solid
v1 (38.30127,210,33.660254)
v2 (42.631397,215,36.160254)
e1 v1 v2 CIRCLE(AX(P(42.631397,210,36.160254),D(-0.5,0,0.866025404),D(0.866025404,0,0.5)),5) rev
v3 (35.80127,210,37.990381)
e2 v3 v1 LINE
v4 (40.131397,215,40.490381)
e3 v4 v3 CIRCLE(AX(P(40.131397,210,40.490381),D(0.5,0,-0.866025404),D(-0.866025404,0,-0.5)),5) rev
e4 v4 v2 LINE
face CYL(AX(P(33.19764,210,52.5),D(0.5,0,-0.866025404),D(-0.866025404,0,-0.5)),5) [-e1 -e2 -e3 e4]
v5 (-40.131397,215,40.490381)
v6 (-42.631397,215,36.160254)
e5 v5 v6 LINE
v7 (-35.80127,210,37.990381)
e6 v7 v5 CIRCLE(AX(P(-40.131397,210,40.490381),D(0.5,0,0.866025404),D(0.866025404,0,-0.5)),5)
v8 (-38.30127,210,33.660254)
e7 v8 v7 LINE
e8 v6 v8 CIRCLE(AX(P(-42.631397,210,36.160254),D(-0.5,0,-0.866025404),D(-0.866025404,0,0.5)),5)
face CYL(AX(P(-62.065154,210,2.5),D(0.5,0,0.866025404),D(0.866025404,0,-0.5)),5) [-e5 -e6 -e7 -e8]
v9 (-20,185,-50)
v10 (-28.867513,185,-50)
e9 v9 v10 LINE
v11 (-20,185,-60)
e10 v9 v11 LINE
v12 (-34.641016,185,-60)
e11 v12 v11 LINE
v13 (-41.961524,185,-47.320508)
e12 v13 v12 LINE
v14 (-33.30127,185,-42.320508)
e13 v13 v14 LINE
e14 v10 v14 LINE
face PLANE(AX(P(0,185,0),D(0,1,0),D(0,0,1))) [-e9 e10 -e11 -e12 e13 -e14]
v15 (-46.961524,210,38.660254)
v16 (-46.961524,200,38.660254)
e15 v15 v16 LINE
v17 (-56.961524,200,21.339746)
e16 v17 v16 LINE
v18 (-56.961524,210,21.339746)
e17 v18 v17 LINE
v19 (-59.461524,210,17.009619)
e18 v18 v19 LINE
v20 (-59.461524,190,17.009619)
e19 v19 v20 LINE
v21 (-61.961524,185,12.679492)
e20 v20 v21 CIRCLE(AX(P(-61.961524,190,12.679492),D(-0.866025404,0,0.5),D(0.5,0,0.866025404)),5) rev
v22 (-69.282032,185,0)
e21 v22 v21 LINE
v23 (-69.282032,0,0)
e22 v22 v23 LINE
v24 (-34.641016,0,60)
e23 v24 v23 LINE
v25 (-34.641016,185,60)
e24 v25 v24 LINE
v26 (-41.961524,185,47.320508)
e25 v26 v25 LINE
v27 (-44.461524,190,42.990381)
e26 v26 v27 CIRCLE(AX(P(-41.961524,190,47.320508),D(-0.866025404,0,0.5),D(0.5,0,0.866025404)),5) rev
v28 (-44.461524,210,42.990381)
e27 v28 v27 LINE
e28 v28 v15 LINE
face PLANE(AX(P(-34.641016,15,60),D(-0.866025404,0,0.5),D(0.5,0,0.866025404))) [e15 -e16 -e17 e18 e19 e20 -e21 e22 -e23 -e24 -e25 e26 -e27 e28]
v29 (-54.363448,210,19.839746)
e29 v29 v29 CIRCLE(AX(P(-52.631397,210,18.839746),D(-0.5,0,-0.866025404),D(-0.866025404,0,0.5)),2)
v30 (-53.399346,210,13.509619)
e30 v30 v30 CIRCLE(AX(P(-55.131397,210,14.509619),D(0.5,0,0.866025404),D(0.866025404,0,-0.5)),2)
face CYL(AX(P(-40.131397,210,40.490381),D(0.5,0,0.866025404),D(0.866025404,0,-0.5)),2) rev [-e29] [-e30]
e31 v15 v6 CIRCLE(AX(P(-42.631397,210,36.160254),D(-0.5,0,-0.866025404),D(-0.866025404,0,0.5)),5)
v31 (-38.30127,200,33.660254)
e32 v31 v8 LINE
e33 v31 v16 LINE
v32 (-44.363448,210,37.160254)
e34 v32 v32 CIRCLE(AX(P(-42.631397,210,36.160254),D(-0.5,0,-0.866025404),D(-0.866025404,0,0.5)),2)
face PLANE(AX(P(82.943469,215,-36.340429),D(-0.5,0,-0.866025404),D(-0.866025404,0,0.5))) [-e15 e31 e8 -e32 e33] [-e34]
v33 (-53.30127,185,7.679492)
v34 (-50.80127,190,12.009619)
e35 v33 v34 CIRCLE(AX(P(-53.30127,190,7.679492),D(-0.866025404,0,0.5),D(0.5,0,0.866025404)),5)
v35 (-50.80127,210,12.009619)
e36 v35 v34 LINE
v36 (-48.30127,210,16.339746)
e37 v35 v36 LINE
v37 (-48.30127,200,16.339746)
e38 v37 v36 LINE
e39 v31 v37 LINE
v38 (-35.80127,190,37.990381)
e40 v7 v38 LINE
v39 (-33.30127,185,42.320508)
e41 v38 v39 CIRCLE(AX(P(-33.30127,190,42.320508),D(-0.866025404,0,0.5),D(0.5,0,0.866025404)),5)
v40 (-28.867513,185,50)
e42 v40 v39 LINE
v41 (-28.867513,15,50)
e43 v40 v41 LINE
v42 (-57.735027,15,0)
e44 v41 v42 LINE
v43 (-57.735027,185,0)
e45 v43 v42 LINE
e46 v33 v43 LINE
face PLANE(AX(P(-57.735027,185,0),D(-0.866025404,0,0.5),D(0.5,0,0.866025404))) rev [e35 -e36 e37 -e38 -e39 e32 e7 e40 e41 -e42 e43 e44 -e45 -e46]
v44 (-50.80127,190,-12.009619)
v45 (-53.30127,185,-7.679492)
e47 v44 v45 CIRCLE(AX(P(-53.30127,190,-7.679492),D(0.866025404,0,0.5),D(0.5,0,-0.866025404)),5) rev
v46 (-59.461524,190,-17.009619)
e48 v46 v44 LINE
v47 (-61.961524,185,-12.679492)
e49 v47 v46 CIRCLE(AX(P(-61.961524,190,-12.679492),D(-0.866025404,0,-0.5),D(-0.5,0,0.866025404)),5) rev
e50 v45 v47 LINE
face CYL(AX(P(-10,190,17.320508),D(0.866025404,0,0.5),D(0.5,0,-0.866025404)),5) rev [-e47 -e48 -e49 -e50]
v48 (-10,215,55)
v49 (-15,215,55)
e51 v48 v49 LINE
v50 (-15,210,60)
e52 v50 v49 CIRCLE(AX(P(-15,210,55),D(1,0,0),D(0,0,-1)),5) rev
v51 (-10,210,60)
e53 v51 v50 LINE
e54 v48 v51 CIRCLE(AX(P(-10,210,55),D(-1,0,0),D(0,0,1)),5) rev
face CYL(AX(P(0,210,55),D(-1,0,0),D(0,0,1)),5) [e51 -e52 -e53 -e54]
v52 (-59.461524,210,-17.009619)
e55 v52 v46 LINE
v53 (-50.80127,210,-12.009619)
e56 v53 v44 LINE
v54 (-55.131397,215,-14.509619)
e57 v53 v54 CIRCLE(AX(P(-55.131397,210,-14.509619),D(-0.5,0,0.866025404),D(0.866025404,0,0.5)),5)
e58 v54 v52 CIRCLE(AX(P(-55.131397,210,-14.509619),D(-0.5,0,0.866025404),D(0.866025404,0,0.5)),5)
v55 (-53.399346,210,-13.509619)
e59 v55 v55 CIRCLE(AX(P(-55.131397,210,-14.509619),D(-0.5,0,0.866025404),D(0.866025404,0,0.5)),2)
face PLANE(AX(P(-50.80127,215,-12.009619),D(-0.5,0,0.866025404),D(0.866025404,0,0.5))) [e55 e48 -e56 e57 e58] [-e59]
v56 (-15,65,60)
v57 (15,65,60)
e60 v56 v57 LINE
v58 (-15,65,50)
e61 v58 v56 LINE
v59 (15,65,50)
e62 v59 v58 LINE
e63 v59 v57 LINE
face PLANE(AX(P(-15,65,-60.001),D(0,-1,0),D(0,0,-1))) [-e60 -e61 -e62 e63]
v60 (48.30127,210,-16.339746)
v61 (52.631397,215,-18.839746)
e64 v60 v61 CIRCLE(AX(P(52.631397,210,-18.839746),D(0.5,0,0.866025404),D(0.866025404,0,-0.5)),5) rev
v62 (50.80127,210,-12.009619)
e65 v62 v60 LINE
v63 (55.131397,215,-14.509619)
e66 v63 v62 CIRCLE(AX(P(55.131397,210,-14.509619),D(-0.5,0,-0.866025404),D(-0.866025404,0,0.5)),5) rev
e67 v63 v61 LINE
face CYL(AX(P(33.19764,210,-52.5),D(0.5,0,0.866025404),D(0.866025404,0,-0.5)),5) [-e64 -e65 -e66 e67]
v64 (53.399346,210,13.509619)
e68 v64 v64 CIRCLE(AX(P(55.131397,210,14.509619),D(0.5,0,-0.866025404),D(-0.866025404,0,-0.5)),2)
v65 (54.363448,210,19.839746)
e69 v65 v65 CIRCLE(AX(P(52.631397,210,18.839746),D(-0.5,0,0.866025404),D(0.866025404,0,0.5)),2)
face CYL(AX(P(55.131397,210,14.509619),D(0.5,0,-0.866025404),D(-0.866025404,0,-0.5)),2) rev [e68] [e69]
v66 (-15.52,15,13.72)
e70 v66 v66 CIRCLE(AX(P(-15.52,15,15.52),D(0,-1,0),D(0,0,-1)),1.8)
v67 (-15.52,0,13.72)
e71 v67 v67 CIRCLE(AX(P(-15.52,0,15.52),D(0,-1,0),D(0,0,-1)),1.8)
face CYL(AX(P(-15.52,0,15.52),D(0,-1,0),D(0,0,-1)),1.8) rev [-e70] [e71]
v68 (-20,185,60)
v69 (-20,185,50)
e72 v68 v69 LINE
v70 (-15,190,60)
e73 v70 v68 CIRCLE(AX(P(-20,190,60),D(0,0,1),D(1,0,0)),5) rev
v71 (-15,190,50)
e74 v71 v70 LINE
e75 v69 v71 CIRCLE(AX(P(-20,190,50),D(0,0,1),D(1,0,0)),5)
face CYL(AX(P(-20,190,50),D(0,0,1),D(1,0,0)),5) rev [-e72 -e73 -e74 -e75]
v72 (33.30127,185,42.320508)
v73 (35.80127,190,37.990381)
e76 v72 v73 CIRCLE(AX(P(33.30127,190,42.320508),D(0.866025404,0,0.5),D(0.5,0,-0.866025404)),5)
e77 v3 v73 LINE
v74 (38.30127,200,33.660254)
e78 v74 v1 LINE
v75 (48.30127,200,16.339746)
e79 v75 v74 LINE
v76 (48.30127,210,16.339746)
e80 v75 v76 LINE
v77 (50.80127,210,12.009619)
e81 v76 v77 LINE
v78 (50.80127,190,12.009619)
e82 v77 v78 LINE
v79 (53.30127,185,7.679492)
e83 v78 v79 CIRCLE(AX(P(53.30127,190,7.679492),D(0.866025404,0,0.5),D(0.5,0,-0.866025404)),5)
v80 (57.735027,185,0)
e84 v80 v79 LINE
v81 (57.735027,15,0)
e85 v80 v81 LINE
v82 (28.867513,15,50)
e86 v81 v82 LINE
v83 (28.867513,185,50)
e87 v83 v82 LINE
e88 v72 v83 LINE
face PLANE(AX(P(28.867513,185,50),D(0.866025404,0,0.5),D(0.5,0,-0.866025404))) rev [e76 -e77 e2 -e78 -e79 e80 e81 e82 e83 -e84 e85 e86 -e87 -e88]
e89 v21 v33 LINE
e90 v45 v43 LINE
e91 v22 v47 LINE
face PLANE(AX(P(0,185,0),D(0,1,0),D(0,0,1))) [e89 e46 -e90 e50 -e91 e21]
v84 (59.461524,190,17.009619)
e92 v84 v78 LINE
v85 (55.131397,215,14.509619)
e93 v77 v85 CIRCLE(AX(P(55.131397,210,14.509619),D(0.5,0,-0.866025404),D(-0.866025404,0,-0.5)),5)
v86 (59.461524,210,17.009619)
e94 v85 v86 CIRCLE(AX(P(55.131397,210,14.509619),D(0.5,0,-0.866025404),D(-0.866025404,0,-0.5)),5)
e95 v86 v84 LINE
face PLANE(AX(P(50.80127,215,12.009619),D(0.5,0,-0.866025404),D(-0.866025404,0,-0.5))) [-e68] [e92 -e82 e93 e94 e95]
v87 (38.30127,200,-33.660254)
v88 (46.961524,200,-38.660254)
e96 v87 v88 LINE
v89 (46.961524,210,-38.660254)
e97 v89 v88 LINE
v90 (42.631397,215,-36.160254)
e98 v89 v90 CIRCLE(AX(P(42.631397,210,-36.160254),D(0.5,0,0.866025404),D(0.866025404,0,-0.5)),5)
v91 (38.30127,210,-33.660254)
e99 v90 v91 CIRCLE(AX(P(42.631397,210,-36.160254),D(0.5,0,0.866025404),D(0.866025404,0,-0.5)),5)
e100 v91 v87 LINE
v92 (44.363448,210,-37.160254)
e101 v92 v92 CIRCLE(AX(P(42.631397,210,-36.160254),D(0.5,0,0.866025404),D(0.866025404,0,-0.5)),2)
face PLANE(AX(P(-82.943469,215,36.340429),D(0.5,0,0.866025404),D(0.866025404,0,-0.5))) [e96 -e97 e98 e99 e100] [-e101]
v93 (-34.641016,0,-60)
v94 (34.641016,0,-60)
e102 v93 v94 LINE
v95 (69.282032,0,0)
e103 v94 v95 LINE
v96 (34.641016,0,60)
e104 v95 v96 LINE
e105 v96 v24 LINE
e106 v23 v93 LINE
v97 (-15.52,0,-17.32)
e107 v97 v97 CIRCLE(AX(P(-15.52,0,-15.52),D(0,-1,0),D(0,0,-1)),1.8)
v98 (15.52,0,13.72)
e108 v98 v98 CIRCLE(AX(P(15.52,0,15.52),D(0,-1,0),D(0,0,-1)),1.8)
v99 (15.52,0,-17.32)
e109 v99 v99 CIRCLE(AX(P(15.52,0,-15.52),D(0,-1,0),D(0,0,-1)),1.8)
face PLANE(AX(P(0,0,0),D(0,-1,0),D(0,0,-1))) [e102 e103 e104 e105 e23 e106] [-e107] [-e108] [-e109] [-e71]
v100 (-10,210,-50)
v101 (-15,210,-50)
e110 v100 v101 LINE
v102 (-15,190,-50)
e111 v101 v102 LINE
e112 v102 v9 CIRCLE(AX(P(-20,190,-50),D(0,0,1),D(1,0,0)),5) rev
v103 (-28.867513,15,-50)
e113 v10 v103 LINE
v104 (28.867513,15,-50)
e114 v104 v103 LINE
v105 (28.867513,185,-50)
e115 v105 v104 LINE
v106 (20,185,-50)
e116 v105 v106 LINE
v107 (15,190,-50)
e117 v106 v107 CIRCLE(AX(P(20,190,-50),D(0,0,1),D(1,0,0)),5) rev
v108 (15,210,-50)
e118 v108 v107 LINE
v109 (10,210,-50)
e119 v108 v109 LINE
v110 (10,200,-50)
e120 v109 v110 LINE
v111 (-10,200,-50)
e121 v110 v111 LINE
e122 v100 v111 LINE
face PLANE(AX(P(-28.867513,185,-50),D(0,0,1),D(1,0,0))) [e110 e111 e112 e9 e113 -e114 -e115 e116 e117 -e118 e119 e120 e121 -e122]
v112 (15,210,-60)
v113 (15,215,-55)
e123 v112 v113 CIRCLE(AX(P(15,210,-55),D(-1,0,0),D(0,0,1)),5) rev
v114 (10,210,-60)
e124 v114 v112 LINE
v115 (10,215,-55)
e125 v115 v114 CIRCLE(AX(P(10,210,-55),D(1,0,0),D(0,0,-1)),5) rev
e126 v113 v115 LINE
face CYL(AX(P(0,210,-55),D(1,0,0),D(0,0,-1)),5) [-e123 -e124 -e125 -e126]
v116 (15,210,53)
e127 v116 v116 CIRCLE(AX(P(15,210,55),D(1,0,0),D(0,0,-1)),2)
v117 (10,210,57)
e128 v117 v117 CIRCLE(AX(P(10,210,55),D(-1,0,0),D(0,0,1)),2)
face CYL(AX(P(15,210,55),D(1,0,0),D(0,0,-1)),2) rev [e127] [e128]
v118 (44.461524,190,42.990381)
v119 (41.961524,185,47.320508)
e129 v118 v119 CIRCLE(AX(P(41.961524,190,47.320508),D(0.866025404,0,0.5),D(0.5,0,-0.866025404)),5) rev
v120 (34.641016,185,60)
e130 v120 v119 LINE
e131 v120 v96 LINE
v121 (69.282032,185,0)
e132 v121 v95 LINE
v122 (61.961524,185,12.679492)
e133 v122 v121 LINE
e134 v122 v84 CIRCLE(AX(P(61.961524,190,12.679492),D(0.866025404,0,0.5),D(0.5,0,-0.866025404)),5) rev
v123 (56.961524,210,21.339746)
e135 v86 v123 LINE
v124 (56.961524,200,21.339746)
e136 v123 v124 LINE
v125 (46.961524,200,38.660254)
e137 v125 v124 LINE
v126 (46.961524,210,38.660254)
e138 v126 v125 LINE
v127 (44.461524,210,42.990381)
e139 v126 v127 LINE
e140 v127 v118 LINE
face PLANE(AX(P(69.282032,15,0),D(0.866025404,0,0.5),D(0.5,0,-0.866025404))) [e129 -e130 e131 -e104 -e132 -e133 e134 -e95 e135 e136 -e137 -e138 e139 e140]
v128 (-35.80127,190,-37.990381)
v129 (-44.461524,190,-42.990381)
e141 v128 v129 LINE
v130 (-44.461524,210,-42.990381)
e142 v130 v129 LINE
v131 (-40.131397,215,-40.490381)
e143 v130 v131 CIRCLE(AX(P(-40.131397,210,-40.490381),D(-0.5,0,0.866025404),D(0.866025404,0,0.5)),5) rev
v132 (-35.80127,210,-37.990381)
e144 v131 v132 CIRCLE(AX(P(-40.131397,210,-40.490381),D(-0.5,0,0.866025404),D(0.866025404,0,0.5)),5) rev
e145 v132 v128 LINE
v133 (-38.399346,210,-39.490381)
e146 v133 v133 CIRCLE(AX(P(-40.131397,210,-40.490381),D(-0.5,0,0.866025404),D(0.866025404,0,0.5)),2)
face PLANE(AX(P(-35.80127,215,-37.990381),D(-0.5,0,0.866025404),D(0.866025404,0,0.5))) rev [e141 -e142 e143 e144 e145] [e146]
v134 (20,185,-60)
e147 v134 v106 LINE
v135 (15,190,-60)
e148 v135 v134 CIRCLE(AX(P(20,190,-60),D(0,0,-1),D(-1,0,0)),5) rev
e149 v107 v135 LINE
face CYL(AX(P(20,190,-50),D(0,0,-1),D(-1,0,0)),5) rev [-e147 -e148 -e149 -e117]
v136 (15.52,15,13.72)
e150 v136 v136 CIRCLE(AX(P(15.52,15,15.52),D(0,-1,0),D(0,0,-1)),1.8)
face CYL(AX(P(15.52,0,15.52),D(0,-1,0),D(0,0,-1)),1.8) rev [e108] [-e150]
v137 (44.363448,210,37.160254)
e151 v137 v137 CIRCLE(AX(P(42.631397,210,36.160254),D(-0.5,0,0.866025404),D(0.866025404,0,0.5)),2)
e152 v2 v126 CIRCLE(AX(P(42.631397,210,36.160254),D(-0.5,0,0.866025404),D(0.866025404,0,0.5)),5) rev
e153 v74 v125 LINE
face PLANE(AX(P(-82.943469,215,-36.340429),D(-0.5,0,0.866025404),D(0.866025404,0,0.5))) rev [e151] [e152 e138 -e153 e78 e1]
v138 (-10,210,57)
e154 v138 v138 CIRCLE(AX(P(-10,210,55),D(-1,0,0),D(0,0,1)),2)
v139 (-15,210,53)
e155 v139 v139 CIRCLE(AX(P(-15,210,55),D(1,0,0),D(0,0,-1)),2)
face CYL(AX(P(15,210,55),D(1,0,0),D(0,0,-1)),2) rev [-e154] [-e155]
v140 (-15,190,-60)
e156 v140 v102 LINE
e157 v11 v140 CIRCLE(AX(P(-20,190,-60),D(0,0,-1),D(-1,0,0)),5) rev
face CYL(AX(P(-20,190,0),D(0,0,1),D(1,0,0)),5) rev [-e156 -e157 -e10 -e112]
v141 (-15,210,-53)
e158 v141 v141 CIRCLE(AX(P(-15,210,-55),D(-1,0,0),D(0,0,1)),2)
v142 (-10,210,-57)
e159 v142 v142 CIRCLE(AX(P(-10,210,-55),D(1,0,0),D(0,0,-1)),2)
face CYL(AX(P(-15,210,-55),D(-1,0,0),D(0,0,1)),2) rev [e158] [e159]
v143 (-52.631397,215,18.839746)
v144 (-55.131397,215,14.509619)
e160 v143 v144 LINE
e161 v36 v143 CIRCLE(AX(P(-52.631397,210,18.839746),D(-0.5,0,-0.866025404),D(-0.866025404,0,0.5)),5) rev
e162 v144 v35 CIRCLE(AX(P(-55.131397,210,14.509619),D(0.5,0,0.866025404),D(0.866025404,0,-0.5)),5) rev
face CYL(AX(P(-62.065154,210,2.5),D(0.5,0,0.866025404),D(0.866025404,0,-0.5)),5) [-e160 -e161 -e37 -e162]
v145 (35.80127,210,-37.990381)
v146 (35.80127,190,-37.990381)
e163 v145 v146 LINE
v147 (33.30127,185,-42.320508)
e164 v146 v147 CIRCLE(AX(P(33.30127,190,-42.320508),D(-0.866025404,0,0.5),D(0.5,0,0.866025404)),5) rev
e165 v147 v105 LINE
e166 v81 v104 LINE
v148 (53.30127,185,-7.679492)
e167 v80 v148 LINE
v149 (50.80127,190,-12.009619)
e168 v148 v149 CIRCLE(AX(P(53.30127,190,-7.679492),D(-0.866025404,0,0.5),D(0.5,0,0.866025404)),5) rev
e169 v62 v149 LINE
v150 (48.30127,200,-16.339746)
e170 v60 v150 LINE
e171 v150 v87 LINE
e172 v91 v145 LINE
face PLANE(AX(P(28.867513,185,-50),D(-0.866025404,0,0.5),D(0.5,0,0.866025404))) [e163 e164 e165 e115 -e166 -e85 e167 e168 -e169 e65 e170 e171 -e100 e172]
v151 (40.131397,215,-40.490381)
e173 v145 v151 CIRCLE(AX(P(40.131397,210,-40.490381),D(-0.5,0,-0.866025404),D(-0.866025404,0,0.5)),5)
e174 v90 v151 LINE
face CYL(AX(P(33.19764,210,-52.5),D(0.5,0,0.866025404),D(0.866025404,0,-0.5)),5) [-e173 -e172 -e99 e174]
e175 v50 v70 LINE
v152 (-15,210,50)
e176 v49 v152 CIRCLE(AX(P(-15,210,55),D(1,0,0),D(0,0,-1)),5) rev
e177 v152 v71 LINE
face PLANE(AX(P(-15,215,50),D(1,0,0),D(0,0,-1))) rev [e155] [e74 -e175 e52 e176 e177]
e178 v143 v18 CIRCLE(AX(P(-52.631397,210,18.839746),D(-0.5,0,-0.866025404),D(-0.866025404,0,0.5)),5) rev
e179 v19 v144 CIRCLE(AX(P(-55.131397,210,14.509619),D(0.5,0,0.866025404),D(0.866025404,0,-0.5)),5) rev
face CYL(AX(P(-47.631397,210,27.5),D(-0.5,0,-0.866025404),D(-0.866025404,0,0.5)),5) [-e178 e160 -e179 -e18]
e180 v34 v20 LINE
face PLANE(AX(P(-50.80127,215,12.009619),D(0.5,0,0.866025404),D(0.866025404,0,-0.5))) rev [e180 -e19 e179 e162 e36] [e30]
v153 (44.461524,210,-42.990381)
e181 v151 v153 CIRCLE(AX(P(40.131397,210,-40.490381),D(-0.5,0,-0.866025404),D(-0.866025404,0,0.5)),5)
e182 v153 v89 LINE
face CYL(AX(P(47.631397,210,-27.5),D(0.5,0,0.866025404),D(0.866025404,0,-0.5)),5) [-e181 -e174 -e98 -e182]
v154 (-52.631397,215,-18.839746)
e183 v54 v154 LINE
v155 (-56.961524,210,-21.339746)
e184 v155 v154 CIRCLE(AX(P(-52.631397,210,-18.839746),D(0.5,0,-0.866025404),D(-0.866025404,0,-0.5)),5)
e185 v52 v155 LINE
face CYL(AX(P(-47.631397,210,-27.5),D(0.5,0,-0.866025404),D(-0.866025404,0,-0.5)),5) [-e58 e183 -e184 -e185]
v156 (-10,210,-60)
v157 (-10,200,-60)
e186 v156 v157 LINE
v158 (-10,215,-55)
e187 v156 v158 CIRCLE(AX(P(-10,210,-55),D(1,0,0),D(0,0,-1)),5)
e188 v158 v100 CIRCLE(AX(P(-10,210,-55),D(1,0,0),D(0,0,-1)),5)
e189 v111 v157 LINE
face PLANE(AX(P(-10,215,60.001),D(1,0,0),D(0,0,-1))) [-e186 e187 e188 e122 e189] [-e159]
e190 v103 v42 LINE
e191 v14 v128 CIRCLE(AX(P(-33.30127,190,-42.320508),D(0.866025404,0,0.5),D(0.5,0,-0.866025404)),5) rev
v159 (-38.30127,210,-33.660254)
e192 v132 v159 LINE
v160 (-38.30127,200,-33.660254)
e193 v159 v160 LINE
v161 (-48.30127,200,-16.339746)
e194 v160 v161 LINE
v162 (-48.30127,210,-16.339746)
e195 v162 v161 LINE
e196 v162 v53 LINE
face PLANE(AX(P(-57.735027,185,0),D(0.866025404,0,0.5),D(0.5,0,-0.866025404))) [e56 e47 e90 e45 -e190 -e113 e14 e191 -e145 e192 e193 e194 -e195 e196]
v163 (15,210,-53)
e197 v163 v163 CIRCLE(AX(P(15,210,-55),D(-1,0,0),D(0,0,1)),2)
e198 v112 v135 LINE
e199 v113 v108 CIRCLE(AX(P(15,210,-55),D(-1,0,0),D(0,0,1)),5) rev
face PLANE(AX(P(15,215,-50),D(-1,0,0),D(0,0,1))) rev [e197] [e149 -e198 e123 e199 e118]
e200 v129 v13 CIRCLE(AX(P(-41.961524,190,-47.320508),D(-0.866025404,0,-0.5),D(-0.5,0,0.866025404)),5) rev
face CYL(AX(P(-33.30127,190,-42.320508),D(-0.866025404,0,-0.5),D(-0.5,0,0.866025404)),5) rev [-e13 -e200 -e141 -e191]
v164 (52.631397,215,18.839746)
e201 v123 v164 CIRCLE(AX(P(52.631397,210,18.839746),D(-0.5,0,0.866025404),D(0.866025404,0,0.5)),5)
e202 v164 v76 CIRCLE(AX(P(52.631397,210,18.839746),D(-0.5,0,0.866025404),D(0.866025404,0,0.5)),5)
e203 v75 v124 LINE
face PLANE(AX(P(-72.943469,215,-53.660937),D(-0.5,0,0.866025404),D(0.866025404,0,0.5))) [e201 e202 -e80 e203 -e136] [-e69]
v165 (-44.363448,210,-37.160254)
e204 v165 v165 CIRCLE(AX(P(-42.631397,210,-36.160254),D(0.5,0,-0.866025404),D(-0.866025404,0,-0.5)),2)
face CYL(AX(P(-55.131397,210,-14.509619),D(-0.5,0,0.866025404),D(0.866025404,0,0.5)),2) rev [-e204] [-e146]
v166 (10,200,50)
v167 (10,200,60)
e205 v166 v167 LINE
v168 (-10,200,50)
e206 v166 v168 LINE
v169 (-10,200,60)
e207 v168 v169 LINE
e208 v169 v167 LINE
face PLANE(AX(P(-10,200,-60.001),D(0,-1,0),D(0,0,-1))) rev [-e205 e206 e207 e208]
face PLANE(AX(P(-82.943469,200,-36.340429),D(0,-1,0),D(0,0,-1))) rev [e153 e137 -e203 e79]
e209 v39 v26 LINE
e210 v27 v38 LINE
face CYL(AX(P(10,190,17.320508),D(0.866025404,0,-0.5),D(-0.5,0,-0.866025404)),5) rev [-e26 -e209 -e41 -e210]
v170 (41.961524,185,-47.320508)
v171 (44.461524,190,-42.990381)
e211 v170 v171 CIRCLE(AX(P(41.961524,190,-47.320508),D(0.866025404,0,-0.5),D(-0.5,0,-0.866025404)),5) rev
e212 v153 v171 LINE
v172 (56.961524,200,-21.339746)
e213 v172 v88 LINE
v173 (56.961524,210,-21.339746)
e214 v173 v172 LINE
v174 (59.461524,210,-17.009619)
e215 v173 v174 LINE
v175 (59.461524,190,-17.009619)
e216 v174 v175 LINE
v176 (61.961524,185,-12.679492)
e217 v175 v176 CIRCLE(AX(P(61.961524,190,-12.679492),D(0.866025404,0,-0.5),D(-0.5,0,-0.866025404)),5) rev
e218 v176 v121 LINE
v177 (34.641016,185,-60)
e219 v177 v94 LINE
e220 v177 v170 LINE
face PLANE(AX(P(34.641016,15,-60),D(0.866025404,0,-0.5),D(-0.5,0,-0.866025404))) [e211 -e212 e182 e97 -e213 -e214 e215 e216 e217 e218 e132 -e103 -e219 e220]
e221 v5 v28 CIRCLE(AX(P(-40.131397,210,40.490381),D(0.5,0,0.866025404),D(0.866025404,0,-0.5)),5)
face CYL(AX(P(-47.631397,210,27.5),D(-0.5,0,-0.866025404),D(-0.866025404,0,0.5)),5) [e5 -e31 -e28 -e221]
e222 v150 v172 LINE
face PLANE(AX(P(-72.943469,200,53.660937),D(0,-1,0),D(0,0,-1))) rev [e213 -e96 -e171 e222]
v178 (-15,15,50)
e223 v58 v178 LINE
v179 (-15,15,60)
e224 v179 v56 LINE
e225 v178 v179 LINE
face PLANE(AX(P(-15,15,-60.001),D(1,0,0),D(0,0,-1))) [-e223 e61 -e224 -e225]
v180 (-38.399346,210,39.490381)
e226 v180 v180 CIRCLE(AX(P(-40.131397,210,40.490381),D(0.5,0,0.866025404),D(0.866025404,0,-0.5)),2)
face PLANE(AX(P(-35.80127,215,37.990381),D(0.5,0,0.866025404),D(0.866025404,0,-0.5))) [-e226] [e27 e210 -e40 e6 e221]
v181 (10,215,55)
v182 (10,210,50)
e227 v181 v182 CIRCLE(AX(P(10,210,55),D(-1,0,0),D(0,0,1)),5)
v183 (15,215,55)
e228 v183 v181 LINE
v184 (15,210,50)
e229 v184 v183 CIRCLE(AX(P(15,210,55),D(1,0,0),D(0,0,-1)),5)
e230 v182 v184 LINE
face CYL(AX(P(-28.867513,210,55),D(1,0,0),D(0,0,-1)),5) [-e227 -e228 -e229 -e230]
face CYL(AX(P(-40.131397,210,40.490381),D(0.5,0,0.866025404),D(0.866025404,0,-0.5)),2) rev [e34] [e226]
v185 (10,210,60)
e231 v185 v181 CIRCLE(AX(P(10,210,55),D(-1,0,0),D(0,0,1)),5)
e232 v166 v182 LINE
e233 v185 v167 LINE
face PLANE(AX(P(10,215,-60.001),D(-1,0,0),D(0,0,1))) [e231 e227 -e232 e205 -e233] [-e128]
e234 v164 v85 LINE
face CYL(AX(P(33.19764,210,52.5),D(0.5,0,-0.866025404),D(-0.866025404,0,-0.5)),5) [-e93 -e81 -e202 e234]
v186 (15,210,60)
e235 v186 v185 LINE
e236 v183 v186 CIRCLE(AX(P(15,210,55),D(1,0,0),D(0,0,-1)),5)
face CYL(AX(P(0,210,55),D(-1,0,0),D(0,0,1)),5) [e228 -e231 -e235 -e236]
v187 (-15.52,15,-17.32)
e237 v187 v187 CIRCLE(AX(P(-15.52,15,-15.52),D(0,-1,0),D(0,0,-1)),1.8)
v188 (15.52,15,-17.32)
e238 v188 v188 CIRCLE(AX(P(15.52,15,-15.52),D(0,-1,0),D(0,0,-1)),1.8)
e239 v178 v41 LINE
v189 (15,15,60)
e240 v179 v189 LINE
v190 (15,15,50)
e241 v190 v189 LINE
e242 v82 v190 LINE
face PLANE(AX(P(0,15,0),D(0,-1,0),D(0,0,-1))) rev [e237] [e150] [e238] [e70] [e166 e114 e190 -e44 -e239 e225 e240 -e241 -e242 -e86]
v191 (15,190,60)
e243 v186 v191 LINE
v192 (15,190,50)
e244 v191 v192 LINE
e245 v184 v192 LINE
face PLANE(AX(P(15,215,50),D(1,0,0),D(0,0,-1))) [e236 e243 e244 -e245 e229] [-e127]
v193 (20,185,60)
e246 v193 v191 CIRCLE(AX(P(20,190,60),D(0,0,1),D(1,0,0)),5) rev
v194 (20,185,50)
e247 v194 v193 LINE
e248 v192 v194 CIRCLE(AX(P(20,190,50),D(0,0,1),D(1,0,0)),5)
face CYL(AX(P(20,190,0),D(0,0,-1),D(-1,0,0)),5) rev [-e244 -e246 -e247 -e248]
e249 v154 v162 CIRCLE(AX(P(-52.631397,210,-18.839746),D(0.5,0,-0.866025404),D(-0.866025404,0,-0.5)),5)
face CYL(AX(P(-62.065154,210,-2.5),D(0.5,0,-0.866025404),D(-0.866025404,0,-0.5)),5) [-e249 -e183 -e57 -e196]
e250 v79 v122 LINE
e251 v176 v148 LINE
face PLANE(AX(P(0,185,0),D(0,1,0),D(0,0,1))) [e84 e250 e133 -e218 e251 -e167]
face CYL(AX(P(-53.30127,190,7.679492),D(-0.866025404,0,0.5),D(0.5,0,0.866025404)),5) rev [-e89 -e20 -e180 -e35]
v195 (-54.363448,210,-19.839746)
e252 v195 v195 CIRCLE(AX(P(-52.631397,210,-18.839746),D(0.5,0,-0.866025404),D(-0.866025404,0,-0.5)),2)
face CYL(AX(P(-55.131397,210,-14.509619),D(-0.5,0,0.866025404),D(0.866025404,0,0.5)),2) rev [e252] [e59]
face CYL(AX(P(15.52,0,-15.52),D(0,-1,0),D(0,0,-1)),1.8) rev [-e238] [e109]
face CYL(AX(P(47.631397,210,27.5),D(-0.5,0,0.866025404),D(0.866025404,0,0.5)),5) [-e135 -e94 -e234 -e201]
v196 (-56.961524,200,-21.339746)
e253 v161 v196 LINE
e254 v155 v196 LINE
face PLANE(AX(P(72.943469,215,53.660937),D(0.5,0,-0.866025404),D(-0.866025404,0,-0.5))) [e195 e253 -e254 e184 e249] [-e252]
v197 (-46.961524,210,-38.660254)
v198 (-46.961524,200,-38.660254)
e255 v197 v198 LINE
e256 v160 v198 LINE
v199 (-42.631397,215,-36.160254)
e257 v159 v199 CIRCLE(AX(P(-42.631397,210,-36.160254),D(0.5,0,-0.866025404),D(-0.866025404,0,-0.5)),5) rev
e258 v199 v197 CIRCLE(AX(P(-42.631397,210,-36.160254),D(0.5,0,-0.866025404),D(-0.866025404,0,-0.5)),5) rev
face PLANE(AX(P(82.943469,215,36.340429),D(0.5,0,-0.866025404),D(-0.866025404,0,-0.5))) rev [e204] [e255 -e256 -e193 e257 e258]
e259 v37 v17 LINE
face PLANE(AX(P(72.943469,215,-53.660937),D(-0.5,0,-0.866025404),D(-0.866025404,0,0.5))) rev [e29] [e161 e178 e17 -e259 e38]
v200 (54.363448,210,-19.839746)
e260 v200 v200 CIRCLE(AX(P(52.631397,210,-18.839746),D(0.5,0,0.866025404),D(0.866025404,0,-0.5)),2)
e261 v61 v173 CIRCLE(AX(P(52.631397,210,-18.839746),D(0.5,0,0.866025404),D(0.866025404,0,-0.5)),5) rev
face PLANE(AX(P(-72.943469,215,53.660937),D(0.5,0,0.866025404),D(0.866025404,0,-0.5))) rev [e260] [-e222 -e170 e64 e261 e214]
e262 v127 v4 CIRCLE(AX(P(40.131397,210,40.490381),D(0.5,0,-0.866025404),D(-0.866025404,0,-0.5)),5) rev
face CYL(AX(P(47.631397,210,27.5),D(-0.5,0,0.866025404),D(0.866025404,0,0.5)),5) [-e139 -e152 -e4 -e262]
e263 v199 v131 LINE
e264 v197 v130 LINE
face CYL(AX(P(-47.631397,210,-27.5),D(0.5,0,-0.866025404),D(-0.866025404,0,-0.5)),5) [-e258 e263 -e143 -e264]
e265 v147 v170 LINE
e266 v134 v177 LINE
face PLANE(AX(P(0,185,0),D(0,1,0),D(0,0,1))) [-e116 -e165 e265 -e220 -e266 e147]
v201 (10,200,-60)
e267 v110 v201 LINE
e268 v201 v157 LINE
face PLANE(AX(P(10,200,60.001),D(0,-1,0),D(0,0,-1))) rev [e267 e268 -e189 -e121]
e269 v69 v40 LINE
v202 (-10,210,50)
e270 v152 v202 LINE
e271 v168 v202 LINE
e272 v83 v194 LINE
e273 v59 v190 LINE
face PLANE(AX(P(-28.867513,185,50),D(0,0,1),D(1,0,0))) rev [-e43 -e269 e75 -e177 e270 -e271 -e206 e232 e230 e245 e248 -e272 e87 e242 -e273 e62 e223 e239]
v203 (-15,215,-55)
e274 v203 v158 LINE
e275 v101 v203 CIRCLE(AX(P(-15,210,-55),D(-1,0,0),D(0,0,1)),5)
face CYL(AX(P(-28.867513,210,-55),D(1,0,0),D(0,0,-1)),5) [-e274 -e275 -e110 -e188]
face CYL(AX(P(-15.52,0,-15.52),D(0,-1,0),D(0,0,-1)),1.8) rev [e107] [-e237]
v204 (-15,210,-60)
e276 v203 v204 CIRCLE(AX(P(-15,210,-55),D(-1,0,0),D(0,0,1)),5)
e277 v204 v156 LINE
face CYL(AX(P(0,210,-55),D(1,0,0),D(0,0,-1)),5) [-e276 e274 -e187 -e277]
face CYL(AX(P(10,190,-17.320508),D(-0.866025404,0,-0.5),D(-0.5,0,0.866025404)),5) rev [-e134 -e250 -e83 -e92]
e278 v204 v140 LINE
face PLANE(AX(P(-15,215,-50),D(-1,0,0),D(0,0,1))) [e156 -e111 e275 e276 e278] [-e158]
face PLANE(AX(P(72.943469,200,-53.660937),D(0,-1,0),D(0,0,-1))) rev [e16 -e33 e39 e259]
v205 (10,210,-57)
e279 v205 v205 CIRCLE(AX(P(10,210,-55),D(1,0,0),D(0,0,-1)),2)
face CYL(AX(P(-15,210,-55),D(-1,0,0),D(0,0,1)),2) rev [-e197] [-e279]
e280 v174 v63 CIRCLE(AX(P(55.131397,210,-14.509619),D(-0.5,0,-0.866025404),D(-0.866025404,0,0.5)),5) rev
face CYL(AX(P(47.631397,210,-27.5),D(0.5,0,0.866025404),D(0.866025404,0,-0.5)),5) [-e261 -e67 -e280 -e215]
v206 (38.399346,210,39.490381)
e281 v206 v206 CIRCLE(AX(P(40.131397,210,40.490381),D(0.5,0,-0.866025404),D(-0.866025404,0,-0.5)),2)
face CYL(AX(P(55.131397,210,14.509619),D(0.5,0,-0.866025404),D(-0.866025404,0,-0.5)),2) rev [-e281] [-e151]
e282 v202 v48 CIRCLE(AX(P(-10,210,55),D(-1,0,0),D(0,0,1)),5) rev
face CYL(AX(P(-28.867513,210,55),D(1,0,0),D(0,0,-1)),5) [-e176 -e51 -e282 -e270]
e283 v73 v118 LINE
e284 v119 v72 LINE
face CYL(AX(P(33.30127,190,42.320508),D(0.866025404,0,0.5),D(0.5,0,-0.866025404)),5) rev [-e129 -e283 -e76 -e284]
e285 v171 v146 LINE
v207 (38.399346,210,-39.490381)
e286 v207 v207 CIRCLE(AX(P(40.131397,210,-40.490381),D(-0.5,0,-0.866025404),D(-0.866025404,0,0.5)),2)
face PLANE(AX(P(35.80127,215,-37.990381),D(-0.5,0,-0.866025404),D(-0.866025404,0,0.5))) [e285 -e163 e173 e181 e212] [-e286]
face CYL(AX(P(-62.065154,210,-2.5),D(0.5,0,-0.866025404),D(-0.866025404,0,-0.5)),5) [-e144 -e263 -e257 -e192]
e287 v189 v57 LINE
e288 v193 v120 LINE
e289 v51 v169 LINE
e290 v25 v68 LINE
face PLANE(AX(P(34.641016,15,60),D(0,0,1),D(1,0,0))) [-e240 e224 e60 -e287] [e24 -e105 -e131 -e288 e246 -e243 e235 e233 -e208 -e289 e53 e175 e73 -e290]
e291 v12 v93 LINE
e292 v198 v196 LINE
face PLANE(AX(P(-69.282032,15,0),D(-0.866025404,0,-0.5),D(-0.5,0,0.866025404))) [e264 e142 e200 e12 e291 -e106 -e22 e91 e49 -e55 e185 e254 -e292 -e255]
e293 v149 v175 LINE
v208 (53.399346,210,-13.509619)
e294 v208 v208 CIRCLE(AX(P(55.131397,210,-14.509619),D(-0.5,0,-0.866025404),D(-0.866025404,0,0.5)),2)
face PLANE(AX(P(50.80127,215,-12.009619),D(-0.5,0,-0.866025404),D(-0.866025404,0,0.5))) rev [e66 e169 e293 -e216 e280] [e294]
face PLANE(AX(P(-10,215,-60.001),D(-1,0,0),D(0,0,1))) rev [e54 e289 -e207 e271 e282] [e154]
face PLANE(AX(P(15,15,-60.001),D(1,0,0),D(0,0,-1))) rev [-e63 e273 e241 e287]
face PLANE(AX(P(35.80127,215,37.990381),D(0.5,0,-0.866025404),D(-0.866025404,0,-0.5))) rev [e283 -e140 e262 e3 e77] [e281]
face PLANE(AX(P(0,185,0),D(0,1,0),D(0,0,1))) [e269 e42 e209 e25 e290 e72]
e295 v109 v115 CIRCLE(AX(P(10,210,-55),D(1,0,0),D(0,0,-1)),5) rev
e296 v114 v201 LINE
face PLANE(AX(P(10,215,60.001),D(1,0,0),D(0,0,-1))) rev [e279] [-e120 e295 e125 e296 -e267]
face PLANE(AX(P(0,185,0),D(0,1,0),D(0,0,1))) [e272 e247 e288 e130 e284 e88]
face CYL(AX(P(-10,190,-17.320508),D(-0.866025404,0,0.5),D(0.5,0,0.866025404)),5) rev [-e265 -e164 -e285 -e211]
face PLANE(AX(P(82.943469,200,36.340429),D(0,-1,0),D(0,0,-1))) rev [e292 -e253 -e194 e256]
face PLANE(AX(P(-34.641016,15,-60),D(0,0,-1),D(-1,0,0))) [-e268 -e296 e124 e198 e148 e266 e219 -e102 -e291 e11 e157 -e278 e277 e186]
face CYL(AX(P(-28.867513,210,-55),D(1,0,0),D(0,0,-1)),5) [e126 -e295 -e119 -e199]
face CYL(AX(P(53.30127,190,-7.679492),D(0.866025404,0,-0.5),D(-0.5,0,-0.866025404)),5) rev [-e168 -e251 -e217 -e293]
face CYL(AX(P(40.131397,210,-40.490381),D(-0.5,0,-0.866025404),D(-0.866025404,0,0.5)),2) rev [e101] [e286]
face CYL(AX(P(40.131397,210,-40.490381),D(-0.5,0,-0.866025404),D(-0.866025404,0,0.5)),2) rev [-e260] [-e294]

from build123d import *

# Parameters (mm, degrees)
BOSS_EXTRUDE1_DEPTH     = 15
BOSS_EXTRUDE3_DEPTH     = 170
SKETCH5_W               = 30
SKETCH5_H               = 10
BOSS_EXTRUDE4_DEPTH     = 30
CIRPATTERN2_COUNT       = 6
CUT_EXTRUDE1_REACH      = 264.726
SKETCH7_W               = 20
SKETCH7_H               = 15
CIRPATTERN4_COUNT       = 6
FILLET1_R               = 5
F_4_0_MM_DOWEL_HOLES1_D = 4
CIRPATTERN8_COUNT       = 6
CUT_EXTRUDE2_REACH      = 257.783
SKETCH11_W              = 30
SKETCH11_H              = 50
M3_CLEARANCE_HOLE1_D    = 3.6
LPATTERN1_COUNT         = 2
LPATTERN1_PITCH         = 31.04
LPATTERN1_COUNT_DIR2    = 2
LPATTERN1_PITCH_DIR2    = 31.04


with BuildPart() as part:
    # Sketch1 → Boss-Extrude1 (new body)
    with BuildSketch(Plane(origin=(0, 0, 0), x_dir=(1, 0, 0), z_dir=(0, 1, 0))):
        Polygon((-69.282032303, 0), (-34.641016151, 60), (34.641016151, 60), (69.282032303, 0), (34.641016151, -60), (-34.641016151, -60), align=None)
    extrude(amount=BOSS_EXTRUDE1_DEPTH)

    # Sketch4 → Boss-Extrude3 (add)
    with BuildSketch(Plane(origin=(0, 15, 0), x_dir=(1, 0, 0), z_dir=(0, 1, 0))):
        Polygon((-34.641016151, -60), (34.641016151, -60), (69.282032303, 0), (57.735026919, 0), (28.867513459, -50), (-28.867513459, -50), (-57.735026919, 0), (-69.282032303, 0), align=None)
    boss_extrude3 = extrude(amount=BOSS_EXTRUDE3_DEPTH)

    # Mirror1: Boss-Extrude3 across plane
    add(boss_extrude3.mirror(Plane(origin=(57.735026919, 185, 0), x_dir=(1, 0, 0), z_dir=(0, 0, 1))))

    # Sketch5 → Boss-Extrude4 (add)
    with BuildSketch(Plane(origin=(0, 185, 0), x_dir=(1, 0, 0), z_dir=(0, 1, 0))):
        with Locations((0, -55)):
            Rectangle(SKETCH5_W, SKETCH5_H)
    boss_extrude4 = extrude(amount=BOSS_EXTRUDE4_DEPTH)

    # CirPattern2: Boss-Extrude4 ×6 about axis
    cirpattern2_axis = Axis((0, 0, 0), (0, 1, 0))
    for i in range(1, CIRPATTERN2_COUNT):
        add(boss_extrude4.rotate(cirpattern2_axis, i * 360 / CIRPATTERN2_COUNT))

    # Sketch7 → Cut-Extrude1 (cut, up to next)
    with BuildSketch(Plane(origin=(-51.961524227, 0, 30), x_dir=(0.49999999999999695, 0, 0.8660254037844404), z_dir=(-0.8660254037844404, 0, 0.49999999999999695)), mode=Mode.PRIVATE) as cut_extrude1_sk1:
        with Locations((0, 207.5)):
            Rectangle(SKETCH7_W, SKETCH7_H)
    cut_extrude1_tool1 = extrude(cut_extrude1_sk1.sketch, amount=-CUT_EXTRUDE1_REACH, mode=Mode.PRIVATE) & part.part
    cut_extrude1 = cut_extrude1_tool1.solids().sort_by_distance((-51.961524, 207.5, 30))[0]
    add(cut_extrude1, mode=Mode.SUBTRACT)

    # CirPattern4: Cut-Extrude1 ×6 about axis
    cirpattern4_axis = Axis((0, 0, 0), (0, 1, 0))
    for i in range(1, CIRPATTERN4_COUNT):
        add(cut_extrude1.rotate(cirpattern4_axis, i * 360 / CIRPATTERN4_COUNT), mode=Mode.SUBTRACT)

    # Fillet1
    fillet1_edges = [part.edges().sort_by_distance(p)[0] for p in [
        (-55.131397208, 185, 14.509618943),
        (-40.131397208, 185, 40.490381057),
        (-40.131397208, 185, -40.490381057),
        (-55.131397208, 185, -14.509618943),
        (15, 185, -55),
        (-15, 185, -55),
        (55.131397208, 185, -14.509618943),
        (40.131397208, 185, -40.490381057),
        (40.131397208, 185, 40.490381057),
        (55.131397208, 185, 14.509618943),
        (-15, 185, 55),
        (15, 185, 55),
    ]]
    fillet(fillet1_edges, radius=FILLET1_R)
    fillet1_2_edges = [part.edges().sort_by_distance(p)[0] for p in [
        (-49.551270189, 215, 14.174682453),
        (-58.211524227, 215, 19.174682453),
        (-37.051270189, 215, -35.825317547),
        (-45.711524227, 215, -40.825317547),
        (12.5, 215, -50),
        (12.5, 215, -60),
        (49.551270189, 215, -14.174682453),
        (58.211524227, 215, -19.174682453),
        (37.051270189, 215, 35.825317547),
        (45.711524227, 215, 40.825317547),
        (-37.051270189, 215, 35.825317547),
        (-45.711524227, 215, 40.825317547),
        (49.551270189, 215, 14.174682453),
        (58.211524227, 215, 19.174682453),
        (-49.551270189, 215, -14.174682453),
        (-58.211524227, 215, -19.174682453),
        (-12.5, 215, -50),
        (-12.5, 215, -60),
        (37.051270189, 215, -35.825317547),
        (45.711524227, 215, -40.825317547),
        (12.5, 215, 50),
        (12.5, 215, 60),
        (-12.5, 215, 50),
        (-12.5, 215, 60),
    ]]
    fillet(fillet1_2_edges, radius=FILLET1_R - 0.0001)  # a hair under: the kernel refuses the full size

    # Ø4.0 mm Dowel Holes1 (through all)
    with Locations(Plane(origin=(15, 0, 0), x_dir=(0, 0, -1), z_dir=(1, 0, 0))):
        with Locations((-55, 210)):
            f_4_0_mm_dowel_holes1 = Hole(F_4_0_MM_DOWEL_HOLES1_D / 2)

    # CirPattern8: Ø4.0 mm Dowel Holes1 ×6 about axis
    cirpattern8_axis = Axis((0, 15, 0), (0, -1, 0))
    for i in range(1, CIRPATTERN8_COUNT):
        add(f_4_0_mm_dowel_holes1.rotate(cirpattern8_axis, i * 360 / CIRPATTERN8_COUNT), mode=Mode.SUBTRACT)

    # Sketch11 → Cut-Extrude2 (cut, up to next)
    with BuildSketch(Plane.XY.offset(60), mode=Mode.PRIVATE) as cut_extrude2_sk1:
        with Locations((0, 40)):
            Rectangle(SKETCH11_W, SKETCH11_H)
    cut_extrude2_tool1 = extrude(cut_extrude2_sk1.sketch, amount=-CUT_EXTRUDE2_REACH, mode=Mode.PRIVATE) & part.part
    add(cut_extrude2_tool1.solids().sort_by_distance((0, 40, 60))[0], mode=Mode.SUBTRACT)

    # M3 Clearance Hole1 (through all)
    with Locations(Plane(origin=(0, 0, 0), x_dir=(-1, 0, 0), z_dir=(0, -1, 0))):
        with Locations((-15.52, 15.52)):
            m3_clearance_hole1 = Hole(M3_CLEARANCE_HOLE1_D / 2)

    # LPattern1: M3 Clearance Hole1 2 × 2
    with Locations(*[(-i * LPATTERN1_PITCH, 0, j * LPATTERN1_PITCH_DIR2) for i in range(LPATTERN1_COUNT) for j in range(LPATTERN1_COUNT_DIR2) if (i, j) != (0, 0)]):
        add(m3_clearance_hole1, mode=Mode.SUBTRACT)


solid = part.part
